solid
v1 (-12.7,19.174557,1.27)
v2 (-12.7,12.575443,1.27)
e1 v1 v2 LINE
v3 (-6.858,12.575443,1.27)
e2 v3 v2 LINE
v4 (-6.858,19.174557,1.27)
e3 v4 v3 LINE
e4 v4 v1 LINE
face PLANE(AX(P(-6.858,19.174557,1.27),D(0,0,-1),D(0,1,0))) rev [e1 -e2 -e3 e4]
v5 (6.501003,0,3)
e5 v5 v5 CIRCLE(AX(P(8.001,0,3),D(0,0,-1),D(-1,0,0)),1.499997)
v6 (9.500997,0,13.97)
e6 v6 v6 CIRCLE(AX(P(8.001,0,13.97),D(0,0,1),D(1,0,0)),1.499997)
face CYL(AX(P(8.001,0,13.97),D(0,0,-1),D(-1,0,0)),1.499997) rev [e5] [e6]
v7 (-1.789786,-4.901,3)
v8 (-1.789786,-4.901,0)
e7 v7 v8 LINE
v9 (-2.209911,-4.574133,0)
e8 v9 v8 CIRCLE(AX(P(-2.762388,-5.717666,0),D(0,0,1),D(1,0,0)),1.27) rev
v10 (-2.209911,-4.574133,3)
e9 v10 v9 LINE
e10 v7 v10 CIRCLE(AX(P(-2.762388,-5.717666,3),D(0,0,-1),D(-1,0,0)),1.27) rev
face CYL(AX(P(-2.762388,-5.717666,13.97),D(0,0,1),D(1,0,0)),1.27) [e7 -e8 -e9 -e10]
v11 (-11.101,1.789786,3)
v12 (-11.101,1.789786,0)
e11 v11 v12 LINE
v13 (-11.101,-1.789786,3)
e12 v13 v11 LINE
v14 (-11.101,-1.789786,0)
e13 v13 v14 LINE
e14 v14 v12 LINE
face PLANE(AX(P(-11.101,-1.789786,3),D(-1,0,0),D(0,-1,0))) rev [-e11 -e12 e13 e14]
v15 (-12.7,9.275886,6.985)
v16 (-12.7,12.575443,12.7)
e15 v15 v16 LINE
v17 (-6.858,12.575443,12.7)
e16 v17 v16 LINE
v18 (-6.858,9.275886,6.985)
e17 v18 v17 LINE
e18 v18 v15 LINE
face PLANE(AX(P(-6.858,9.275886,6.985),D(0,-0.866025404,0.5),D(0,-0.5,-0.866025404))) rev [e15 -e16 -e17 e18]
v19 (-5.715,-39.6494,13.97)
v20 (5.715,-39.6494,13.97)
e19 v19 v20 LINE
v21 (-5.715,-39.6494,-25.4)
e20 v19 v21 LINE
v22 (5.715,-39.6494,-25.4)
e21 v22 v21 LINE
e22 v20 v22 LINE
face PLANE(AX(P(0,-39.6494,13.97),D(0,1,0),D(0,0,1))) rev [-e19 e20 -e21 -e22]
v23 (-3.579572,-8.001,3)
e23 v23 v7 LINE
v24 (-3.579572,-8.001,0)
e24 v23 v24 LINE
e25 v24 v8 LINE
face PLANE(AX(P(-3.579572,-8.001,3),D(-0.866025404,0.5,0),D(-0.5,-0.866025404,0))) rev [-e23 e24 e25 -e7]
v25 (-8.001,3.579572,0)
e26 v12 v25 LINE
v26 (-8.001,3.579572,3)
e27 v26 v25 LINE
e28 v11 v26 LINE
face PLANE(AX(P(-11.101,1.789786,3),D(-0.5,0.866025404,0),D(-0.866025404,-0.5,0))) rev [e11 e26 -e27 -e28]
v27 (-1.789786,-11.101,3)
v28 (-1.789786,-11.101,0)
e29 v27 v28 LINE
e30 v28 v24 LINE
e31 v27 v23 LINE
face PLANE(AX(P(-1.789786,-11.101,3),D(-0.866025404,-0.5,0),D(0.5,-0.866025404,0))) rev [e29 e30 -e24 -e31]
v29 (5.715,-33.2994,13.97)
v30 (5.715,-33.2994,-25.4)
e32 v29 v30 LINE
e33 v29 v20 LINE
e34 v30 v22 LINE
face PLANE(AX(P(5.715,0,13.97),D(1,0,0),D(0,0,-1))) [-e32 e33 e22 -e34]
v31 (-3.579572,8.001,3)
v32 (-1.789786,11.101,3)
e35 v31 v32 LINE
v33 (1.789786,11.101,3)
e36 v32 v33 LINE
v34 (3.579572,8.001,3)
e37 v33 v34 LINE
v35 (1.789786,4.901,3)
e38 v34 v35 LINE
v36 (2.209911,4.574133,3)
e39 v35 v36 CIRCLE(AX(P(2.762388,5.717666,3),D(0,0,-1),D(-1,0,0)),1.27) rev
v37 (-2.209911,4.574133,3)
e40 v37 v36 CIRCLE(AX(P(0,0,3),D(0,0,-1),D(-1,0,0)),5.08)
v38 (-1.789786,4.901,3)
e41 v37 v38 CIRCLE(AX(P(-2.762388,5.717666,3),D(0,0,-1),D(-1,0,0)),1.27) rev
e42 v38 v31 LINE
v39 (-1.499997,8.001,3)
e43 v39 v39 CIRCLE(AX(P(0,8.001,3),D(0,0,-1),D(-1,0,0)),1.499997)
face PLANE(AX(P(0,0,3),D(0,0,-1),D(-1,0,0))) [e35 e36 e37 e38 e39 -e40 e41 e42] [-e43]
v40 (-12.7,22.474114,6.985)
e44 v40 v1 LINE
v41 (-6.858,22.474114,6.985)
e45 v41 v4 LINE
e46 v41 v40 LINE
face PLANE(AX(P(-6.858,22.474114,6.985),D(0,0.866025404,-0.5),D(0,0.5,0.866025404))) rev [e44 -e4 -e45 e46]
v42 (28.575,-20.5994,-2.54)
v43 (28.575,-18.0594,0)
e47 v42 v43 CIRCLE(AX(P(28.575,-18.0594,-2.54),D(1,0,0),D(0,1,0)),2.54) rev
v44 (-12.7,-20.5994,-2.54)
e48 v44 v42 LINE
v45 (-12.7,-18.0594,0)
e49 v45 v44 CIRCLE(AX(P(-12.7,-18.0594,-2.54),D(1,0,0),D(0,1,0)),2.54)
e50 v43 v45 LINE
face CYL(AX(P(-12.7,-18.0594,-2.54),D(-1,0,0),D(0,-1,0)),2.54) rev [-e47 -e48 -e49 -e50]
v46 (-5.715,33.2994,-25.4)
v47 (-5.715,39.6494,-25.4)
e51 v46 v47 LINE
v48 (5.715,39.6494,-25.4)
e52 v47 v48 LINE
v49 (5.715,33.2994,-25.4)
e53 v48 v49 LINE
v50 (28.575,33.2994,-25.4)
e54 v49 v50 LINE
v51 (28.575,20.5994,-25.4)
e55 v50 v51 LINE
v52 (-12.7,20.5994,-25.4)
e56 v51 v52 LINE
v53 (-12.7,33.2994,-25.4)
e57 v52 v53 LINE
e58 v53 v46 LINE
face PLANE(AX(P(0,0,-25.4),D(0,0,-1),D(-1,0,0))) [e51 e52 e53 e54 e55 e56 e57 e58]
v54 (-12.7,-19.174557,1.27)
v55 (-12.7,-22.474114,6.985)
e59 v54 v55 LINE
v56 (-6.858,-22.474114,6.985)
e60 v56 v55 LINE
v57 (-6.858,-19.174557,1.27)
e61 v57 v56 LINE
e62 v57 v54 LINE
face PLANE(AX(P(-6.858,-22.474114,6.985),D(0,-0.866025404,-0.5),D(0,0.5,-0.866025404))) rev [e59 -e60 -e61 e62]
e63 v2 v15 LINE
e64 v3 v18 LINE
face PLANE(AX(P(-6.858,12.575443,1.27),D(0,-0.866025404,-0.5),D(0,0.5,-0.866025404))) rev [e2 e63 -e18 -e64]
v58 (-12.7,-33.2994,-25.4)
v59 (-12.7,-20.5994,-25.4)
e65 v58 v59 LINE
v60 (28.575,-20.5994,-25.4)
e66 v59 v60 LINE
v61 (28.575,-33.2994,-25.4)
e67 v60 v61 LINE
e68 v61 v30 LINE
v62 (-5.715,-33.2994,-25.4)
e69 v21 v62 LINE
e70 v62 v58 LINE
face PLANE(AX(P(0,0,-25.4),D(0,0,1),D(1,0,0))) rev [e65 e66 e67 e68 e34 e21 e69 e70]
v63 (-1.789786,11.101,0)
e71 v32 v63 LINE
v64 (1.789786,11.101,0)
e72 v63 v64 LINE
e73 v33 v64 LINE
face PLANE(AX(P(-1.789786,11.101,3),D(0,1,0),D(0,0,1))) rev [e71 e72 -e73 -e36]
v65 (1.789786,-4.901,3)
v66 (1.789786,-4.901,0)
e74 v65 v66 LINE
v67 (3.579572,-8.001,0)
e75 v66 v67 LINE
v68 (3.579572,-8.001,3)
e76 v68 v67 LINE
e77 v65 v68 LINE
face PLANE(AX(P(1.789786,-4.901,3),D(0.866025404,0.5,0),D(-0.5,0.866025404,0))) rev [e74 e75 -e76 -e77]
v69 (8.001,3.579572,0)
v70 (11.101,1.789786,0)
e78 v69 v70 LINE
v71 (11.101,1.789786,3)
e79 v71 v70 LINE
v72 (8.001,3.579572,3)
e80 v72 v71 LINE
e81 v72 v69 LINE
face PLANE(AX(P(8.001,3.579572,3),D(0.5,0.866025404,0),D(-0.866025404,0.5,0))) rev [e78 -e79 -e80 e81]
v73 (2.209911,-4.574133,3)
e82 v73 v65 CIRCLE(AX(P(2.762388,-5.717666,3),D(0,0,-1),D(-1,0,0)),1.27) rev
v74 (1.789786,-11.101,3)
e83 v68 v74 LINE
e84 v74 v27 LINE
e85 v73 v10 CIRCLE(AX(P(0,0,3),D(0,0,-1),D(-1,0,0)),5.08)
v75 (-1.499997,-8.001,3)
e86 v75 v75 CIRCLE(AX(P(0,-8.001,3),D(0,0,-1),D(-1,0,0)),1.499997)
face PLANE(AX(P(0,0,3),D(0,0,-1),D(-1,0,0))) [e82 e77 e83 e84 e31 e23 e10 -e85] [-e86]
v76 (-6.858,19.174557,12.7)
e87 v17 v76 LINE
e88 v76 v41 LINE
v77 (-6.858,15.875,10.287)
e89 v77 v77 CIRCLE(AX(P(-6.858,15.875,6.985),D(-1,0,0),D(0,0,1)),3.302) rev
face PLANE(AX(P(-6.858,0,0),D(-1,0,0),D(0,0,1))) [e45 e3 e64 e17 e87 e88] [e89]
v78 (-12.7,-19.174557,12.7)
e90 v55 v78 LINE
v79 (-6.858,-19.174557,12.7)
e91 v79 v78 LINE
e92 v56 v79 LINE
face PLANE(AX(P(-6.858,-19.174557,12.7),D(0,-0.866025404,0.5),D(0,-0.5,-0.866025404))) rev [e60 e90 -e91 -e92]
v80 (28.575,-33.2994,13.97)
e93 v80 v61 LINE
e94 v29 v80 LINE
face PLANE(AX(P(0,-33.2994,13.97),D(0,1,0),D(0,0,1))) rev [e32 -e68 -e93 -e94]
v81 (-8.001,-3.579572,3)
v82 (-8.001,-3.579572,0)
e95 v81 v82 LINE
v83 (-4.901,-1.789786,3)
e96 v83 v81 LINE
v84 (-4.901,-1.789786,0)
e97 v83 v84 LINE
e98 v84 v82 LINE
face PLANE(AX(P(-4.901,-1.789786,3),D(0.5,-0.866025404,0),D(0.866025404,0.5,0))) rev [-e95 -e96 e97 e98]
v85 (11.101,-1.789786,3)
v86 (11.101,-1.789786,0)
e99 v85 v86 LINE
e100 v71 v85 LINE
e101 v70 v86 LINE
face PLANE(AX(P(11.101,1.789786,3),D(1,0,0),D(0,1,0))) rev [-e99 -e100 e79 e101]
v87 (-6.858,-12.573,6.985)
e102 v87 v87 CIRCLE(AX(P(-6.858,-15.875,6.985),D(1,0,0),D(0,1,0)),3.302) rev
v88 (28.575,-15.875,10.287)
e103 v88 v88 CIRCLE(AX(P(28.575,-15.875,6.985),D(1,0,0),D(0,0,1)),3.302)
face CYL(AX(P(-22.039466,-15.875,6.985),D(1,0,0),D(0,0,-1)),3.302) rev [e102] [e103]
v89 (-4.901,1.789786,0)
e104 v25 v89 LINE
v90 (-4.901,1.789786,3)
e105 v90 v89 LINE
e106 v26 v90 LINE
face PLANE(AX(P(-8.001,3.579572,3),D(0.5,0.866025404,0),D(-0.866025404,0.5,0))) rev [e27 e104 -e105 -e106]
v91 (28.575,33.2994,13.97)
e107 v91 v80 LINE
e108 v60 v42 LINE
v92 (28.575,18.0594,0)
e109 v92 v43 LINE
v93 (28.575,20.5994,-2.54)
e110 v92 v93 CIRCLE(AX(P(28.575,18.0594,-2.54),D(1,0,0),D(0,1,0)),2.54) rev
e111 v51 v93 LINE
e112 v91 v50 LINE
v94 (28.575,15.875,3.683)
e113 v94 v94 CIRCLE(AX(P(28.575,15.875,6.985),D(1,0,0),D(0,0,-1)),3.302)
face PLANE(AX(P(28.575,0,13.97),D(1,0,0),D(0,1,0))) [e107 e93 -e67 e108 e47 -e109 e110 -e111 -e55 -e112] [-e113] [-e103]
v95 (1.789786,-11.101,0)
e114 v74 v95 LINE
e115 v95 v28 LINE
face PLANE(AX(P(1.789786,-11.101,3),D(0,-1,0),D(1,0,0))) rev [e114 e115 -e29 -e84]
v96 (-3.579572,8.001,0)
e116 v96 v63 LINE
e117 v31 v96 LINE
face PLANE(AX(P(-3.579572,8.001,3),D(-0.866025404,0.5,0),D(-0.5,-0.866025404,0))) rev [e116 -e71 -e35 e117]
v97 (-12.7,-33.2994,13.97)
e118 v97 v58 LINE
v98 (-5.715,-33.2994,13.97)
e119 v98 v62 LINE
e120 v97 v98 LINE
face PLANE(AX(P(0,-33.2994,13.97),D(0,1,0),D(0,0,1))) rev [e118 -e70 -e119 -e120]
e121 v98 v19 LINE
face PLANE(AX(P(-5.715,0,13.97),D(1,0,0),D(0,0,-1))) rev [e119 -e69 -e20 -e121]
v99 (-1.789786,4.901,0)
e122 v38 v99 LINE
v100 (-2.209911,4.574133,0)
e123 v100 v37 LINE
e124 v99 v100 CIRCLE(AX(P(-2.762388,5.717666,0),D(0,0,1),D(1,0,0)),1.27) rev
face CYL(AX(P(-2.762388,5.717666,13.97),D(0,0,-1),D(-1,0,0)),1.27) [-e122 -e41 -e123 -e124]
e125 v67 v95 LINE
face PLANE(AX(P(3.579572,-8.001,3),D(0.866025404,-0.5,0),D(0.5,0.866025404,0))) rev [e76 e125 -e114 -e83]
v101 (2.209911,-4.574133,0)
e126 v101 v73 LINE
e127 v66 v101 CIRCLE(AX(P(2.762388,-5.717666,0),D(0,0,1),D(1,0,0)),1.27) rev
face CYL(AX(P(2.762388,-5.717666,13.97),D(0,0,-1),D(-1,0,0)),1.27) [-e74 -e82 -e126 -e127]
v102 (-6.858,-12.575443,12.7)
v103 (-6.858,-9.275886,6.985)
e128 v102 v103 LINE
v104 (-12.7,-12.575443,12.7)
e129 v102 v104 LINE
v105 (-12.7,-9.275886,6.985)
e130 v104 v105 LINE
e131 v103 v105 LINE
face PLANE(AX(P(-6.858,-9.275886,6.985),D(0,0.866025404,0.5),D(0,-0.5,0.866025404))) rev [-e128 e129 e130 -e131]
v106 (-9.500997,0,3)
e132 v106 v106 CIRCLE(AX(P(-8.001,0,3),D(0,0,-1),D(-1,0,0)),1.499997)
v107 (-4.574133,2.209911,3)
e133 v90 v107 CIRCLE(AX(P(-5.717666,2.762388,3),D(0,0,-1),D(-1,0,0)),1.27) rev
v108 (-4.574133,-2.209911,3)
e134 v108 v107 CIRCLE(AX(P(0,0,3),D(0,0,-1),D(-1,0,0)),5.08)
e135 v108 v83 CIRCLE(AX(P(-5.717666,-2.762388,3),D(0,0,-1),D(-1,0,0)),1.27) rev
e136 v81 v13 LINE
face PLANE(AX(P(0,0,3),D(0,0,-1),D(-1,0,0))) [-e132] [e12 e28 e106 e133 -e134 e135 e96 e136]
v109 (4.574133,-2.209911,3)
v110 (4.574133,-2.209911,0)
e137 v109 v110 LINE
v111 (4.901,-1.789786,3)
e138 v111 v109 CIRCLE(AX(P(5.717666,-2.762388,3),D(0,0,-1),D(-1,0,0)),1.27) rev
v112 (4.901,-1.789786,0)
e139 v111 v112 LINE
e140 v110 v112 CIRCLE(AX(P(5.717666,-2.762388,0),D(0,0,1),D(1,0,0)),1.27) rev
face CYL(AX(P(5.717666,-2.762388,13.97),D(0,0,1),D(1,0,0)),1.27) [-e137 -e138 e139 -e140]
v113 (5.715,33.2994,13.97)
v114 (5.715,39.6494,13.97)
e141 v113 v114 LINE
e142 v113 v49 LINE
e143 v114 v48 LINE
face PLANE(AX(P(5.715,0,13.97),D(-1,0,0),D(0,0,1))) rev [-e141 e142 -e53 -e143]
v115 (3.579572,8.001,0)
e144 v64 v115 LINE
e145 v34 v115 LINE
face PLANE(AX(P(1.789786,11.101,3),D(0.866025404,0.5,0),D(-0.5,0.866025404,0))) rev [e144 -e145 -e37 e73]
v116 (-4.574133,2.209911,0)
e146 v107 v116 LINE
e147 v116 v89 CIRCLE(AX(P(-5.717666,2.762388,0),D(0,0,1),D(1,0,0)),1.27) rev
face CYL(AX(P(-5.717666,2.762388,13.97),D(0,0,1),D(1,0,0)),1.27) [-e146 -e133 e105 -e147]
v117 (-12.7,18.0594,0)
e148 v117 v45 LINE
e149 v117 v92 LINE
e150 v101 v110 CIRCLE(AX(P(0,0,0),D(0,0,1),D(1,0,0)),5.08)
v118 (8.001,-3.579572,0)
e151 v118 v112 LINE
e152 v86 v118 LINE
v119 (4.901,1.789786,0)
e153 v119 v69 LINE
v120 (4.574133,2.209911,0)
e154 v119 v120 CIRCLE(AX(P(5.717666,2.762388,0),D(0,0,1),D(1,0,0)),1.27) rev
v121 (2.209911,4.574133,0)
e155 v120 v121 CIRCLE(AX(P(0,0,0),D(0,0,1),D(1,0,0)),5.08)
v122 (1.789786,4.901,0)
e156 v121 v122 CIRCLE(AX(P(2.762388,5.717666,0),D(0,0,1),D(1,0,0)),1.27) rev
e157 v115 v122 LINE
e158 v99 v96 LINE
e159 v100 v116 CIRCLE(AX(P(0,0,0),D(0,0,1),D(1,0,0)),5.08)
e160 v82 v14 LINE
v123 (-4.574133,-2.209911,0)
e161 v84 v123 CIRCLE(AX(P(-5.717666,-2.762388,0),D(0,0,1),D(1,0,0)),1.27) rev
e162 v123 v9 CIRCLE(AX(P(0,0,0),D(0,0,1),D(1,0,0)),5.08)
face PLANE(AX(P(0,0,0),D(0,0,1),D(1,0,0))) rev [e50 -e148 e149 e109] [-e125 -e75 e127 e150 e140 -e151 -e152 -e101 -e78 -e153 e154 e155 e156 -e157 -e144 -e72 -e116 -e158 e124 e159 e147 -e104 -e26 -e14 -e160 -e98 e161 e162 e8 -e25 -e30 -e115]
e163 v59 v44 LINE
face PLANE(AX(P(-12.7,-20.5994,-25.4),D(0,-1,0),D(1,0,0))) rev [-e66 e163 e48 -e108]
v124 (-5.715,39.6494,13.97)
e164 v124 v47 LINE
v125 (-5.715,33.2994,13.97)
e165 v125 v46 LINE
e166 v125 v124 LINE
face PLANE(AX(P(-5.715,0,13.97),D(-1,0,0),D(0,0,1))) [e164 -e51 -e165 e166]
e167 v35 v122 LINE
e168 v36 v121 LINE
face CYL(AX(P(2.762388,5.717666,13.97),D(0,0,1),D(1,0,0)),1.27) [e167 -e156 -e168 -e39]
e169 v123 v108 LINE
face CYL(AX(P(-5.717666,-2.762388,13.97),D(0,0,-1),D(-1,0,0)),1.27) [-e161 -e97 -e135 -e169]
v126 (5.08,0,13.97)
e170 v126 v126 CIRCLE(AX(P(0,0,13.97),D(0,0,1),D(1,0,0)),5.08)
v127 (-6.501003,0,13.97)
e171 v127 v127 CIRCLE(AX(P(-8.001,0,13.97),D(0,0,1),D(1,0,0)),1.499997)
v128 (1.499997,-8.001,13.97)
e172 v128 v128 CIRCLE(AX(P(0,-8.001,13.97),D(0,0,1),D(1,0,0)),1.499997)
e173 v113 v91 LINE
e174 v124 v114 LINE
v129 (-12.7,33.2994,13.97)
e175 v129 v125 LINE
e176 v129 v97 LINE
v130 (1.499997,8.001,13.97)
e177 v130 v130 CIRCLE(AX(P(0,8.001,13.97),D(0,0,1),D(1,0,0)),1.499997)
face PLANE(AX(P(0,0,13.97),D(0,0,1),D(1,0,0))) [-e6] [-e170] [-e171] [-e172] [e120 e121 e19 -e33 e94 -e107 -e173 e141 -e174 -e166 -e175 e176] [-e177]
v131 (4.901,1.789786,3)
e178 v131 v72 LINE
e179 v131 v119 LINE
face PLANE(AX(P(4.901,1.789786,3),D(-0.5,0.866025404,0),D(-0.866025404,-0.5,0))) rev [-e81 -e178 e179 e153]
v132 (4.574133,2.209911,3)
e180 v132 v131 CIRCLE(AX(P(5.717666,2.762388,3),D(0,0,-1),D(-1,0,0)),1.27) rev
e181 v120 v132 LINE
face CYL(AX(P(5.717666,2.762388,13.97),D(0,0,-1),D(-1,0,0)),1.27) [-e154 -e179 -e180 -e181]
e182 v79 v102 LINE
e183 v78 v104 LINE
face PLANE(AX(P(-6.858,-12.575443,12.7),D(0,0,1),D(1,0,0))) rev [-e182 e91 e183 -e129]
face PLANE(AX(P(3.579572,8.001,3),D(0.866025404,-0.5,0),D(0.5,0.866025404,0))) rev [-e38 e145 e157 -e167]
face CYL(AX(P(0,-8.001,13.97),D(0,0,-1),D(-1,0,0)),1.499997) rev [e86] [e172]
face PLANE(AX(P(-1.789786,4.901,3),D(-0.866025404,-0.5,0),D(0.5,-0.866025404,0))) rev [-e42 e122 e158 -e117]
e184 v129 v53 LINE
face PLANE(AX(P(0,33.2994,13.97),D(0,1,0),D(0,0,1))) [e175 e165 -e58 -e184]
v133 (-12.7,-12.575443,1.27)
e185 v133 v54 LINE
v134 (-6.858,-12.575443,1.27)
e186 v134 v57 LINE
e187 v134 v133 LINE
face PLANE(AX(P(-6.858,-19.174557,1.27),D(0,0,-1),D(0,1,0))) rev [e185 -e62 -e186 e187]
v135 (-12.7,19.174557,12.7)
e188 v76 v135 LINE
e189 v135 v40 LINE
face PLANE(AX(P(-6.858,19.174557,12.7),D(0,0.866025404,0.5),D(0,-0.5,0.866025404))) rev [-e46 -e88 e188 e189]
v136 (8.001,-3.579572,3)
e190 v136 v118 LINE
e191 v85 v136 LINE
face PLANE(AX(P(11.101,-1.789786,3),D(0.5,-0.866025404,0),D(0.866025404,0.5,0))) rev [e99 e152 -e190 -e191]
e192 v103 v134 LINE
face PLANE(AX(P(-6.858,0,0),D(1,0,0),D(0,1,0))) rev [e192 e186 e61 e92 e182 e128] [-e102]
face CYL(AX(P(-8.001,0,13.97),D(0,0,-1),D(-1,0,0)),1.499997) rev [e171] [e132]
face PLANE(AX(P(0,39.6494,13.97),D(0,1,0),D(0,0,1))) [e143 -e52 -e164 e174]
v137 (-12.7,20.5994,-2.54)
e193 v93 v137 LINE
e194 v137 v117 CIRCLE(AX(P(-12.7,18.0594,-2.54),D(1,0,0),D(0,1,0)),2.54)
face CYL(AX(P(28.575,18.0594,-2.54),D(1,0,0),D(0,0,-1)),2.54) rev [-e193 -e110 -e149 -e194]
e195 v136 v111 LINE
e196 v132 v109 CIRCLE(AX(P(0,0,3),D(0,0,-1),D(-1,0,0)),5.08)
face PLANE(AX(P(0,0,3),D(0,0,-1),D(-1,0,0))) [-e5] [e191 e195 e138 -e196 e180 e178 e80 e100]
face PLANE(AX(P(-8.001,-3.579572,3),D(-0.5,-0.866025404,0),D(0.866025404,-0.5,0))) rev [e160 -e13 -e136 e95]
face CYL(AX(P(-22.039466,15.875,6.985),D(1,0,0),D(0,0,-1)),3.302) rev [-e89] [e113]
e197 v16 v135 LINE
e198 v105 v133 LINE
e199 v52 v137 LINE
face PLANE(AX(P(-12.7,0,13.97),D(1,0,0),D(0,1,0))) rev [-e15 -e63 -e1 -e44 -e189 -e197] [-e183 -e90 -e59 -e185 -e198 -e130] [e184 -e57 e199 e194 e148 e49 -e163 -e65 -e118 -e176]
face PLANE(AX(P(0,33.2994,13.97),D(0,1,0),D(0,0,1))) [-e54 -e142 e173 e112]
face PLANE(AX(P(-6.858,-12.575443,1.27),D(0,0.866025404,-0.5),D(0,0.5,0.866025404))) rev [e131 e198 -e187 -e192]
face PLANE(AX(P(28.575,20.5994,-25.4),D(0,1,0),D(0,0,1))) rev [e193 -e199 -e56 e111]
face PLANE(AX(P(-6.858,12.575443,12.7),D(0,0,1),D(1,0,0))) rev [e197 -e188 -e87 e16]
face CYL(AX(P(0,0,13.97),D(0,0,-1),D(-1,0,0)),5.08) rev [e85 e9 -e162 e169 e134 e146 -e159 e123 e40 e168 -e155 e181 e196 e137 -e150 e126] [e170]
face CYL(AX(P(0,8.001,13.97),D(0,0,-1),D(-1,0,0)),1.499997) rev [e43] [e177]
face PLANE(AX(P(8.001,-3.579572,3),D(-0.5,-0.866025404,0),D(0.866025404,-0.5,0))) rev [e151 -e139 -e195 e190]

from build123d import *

# Parameters (mm, degrees)
SKETCH1_R           = 1.499997
SKETCH1_R_2         = 5.08
BOSS_EXTRUDE1_DEPTH = 13.97
CUT_EXTRUDE1_DEPTH  = 3
FILLET1_R           = 1.27
SKETCH3_R           = 3.302
CUT_EXTRUDE2_DEPTH  = 41.275
CUT_EXTRUDE3_DEPTH  = 5.842
BOSS_EXTRUDE2_DEPTH = 25.4
FILLET2_R           = 2.54


with BuildPart() as part:
    # Sketch1 → Boss-Extrude1 (new body)
    with BuildSketch(Plane.XY):
        Polygon((-12.7, 33.2994), (-5.715, 33.2994), (-5.715, 39.6494), (5.715, 39.6494), (5.715, 33.2994), (28.575, 33.2994), (28.575, -33.2994), (5.715, -33.2994), (5.715, -39.6494), (-5.715, -39.6494), (-5.715, -33.2994), (-12.7, -33.2994), align=None)
        with Locations((0, 8.001)):
            Circle(SKETCH1_R, mode=Mode.SUBTRACT)
        with Locations((8.001, 0)):
            Circle(SKETCH1_R, mode=Mode.SUBTRACT)
        Circle(SKETCH1_R_2, mode=Mode.SUBTRACT)
        with Locations((0, -8.001)):
            Circle(SKETCH1_R, mode=Mode.SUBTRACT)
        with Locations((-8.001, 0)):
            Circle(SKETCH1_R, mode=Mode.SUBTRACT)
    extrude(amount=BOSS_EXTRUDE1_DEPTH)

    # Sketch2 → Cut-Extrude1 (cut)
    with BuildSketch(Plane(origin=(0, 0, 0), x_dir=(-1, 0, 0), z_dir=(0, 0, -1))):
        Polygon((8.001, -3.579571669), (11.101, -1.789785834), (11.101, 1.789785834), (8.001, 3.579571669), (4.901, 1.789785834), (4.901, -1.789785834), align=None)
        Polygon((3.579571669, 8.001), (1.789785834, 11.101), (-1.789785834, 11.101), (-3.579571669, 8.001), (-1.789785834, 4.901), (1.789785834, 4.901), align=None)
        Polygon((-3.579571669, -8.001), (-1.789785834, -11.101), (1.789785834, -11.101), (3.579571669, -8.001), (1.789785834, -4.901), (-1.789785834, -4.901), align=None)
        Polygon((-8.001, 3.579571669), (-11.101, 1.789785834), (-11.101, -1.789785834), (-8.001, -3.579571669), (-4.901, -1.789785834), (-4.901, 1.789785834), align=None)
    extrude(amount=-CUT_EXTRUDE1_DEPTH, mode=Mode.SUBTRACT)

    # Fillet1
    # the kernel refuses this fillet: 1.27 mm, written as the material it takes off along each edge
    with BuildSketch(Plane(origin=(-4.901, -1.336637198, 3), x_dir=(0.3505491054701989, -0.9365443527425935, 0), z_dir=(0, 0, -1)), Plane(origin=(-1.336637198, 4.901, 3), x_dir=(-0.9365443527425947, -0.3505491054701953, 0), z_dir=(0, 0, -1)), Plane(origin=(1.336637198, -4.901, 3), x_dir=(0.9365443527425922, 0.3505491054702024, 0), z_dir=(0, 0, -1))) as fillet1_piece_1:
        with BuildLine():
            CenterArc((1.048997579, 1.264640212), FILLET1_R, 240.540119445, 24.194103812)
            Line((0.424393796, 0.158850849), (0, 0))
            ThreePointArc((0, 0), (0.466221146, 0.021439153), (0.932442292, 0))
        make_face()
    extrude(amount=5.331105731, mode=Mode.SUBTRACT)
    with BuildSketch(Plane(origin=(-4.901, 1.336637198, 3), x_dir=(0.35054910547019297, 0.9365443527425957, 0), z_dir=(0, 0, -1)), Plane(origin=(1.336637198, 4.901, 3), x_dir=(0.9365443527425946, -0.3505491054701959, 0), z_dir=(0, 0, -1)), Plane(origin=(-1.336637198, -4.901, 3), x_dir=(-0.9365443527425968, 0.35054910547018975, 0), z_dir=(0, 0, -1))) as fillet1_piece_2:
        with BuildLine():
            CenterArc((1.048997579, -1.264640212), FILLET1_R, 95.265776743, 24.194103812)
            Line((0.424393796, -0.158850849), (0, 0))
            ThreePointArc((0, 0), (0.466221146, -0.021439153), (0.932442292, 0))
        make_face()
    extrude(amount=5.331105731, mode=Mode.SUBTRACT)
    with BuildSketch(Plane(origin=(4.901, 1.336637198, 3), x_dir=(0, 1, 0), z_dir=(0, 0, -1))) as fillet1_piece_3:
        with BuildLine():
            CenterArc((1.425751253, 0.816666486), FILLET1_R, 220.019214916, 24.194103812)
            ThreePointArc((0.873273563, -0.326866811), (0.444152257, -0.143354688), (0, 0))
            Line((0, 0), (0.453148636, 0))
        make_face()
    extrude(amount=5.331105731, mode=Mode.SUBTRACT)
    with BuildSketch(Plane(origin=(4.901, -1.336637198, 3), x_dir=(0, -1, 0), z_dir=(0, 0, -1))) as fillet1_piece_4:
        with BuildLine():
            CenterArc((1.425751253, -0.816666486), FILLET1_R, 115.786681272, 24.194103812)
            ThreePointArc((0.873273563, 0.326866811), (0.444152257, 0.143354688), (0, 0))
            Line((0, 0), (0.453148636, 0))
        make_face()
    extrude(amount=5.331105731, mode=Mode.SUBTRACT)

    # Sketch3 → Cut-Extrude2 (cut)
    with BuildSketch(Plane(origin=(28.575, 0, 0), x_dir=(0, 0, -1), z_dir=(1, 0, 0))):
        with Locations((-6.985, 15.875)):
            Circle(SKETCH3_R)
        with Locations(Location((-6.985, -15.875, 0), (0, 0, 90))):
            Circle(SKETCH3_R)
    extrude(amount=-CUT_EXTRUDE2_DEPTH, mode=Mode.SUBTRACT)

    # Sketch4 → Cut-Extrude3 (cut)
    with BuildSketch(Plane.ZY.offset(12.7)):
        Polygon((12.7, -19.174556788), (6.985, -22.474113577), (1.27, -19.174556788), (1.27, -12.575443212), (6.985, -9.275886423), (12.7, -12.575443212), align=None)
        Polygon((6.985, 22.474113577), (1.27, 19.174556788), (1.27, 12.575443212), (6.985, 9.275886423), (12.7, 12.575443212), (12.7, 19.174556788), align=None)
    extrude(amount=-CUT_EXTRUDE3_DEPTH, mode=Mode.SUBTRACT)

    # Sketch5 → Boss-Extrude2 (add)
    with BuildSketch(Plane(origin=(0, 0, 0), x_dir=(-1, 0, 0), z_dir=(0, 0, -1))):
        Polygon((-28.575, 20.5994), (12.7, 20.5994), (12.7, 33.2994), (5.715, 33.2994), (5.715, 39.6494), (-5.715, 39.6494), (-5.715, 33.2994), (-28.575, 33.2994), align=None)
        Polygon((12.7, -20.5994), (-28.575, -20.5994), (-28.575, -33.2994), (-5.715, -33.2994), (-5.715, -39.6494), (5.715, -39.6494), (5.715, -33.2994), (12.7, -33.2994), align=None)
    extrude(amount=BOSS_EXTRUDE2_DEPTH)

    # Fillet2
    fillet2_edges = [part.edges().sort_by_distance(p)[0] for p in [
        (7.9375, -20.5994, 0),
        (7.9375, 20.5994, 0),
    ]]
    fillet(fillet2_edges, radius=FILLET2_R)


solid = part.part
